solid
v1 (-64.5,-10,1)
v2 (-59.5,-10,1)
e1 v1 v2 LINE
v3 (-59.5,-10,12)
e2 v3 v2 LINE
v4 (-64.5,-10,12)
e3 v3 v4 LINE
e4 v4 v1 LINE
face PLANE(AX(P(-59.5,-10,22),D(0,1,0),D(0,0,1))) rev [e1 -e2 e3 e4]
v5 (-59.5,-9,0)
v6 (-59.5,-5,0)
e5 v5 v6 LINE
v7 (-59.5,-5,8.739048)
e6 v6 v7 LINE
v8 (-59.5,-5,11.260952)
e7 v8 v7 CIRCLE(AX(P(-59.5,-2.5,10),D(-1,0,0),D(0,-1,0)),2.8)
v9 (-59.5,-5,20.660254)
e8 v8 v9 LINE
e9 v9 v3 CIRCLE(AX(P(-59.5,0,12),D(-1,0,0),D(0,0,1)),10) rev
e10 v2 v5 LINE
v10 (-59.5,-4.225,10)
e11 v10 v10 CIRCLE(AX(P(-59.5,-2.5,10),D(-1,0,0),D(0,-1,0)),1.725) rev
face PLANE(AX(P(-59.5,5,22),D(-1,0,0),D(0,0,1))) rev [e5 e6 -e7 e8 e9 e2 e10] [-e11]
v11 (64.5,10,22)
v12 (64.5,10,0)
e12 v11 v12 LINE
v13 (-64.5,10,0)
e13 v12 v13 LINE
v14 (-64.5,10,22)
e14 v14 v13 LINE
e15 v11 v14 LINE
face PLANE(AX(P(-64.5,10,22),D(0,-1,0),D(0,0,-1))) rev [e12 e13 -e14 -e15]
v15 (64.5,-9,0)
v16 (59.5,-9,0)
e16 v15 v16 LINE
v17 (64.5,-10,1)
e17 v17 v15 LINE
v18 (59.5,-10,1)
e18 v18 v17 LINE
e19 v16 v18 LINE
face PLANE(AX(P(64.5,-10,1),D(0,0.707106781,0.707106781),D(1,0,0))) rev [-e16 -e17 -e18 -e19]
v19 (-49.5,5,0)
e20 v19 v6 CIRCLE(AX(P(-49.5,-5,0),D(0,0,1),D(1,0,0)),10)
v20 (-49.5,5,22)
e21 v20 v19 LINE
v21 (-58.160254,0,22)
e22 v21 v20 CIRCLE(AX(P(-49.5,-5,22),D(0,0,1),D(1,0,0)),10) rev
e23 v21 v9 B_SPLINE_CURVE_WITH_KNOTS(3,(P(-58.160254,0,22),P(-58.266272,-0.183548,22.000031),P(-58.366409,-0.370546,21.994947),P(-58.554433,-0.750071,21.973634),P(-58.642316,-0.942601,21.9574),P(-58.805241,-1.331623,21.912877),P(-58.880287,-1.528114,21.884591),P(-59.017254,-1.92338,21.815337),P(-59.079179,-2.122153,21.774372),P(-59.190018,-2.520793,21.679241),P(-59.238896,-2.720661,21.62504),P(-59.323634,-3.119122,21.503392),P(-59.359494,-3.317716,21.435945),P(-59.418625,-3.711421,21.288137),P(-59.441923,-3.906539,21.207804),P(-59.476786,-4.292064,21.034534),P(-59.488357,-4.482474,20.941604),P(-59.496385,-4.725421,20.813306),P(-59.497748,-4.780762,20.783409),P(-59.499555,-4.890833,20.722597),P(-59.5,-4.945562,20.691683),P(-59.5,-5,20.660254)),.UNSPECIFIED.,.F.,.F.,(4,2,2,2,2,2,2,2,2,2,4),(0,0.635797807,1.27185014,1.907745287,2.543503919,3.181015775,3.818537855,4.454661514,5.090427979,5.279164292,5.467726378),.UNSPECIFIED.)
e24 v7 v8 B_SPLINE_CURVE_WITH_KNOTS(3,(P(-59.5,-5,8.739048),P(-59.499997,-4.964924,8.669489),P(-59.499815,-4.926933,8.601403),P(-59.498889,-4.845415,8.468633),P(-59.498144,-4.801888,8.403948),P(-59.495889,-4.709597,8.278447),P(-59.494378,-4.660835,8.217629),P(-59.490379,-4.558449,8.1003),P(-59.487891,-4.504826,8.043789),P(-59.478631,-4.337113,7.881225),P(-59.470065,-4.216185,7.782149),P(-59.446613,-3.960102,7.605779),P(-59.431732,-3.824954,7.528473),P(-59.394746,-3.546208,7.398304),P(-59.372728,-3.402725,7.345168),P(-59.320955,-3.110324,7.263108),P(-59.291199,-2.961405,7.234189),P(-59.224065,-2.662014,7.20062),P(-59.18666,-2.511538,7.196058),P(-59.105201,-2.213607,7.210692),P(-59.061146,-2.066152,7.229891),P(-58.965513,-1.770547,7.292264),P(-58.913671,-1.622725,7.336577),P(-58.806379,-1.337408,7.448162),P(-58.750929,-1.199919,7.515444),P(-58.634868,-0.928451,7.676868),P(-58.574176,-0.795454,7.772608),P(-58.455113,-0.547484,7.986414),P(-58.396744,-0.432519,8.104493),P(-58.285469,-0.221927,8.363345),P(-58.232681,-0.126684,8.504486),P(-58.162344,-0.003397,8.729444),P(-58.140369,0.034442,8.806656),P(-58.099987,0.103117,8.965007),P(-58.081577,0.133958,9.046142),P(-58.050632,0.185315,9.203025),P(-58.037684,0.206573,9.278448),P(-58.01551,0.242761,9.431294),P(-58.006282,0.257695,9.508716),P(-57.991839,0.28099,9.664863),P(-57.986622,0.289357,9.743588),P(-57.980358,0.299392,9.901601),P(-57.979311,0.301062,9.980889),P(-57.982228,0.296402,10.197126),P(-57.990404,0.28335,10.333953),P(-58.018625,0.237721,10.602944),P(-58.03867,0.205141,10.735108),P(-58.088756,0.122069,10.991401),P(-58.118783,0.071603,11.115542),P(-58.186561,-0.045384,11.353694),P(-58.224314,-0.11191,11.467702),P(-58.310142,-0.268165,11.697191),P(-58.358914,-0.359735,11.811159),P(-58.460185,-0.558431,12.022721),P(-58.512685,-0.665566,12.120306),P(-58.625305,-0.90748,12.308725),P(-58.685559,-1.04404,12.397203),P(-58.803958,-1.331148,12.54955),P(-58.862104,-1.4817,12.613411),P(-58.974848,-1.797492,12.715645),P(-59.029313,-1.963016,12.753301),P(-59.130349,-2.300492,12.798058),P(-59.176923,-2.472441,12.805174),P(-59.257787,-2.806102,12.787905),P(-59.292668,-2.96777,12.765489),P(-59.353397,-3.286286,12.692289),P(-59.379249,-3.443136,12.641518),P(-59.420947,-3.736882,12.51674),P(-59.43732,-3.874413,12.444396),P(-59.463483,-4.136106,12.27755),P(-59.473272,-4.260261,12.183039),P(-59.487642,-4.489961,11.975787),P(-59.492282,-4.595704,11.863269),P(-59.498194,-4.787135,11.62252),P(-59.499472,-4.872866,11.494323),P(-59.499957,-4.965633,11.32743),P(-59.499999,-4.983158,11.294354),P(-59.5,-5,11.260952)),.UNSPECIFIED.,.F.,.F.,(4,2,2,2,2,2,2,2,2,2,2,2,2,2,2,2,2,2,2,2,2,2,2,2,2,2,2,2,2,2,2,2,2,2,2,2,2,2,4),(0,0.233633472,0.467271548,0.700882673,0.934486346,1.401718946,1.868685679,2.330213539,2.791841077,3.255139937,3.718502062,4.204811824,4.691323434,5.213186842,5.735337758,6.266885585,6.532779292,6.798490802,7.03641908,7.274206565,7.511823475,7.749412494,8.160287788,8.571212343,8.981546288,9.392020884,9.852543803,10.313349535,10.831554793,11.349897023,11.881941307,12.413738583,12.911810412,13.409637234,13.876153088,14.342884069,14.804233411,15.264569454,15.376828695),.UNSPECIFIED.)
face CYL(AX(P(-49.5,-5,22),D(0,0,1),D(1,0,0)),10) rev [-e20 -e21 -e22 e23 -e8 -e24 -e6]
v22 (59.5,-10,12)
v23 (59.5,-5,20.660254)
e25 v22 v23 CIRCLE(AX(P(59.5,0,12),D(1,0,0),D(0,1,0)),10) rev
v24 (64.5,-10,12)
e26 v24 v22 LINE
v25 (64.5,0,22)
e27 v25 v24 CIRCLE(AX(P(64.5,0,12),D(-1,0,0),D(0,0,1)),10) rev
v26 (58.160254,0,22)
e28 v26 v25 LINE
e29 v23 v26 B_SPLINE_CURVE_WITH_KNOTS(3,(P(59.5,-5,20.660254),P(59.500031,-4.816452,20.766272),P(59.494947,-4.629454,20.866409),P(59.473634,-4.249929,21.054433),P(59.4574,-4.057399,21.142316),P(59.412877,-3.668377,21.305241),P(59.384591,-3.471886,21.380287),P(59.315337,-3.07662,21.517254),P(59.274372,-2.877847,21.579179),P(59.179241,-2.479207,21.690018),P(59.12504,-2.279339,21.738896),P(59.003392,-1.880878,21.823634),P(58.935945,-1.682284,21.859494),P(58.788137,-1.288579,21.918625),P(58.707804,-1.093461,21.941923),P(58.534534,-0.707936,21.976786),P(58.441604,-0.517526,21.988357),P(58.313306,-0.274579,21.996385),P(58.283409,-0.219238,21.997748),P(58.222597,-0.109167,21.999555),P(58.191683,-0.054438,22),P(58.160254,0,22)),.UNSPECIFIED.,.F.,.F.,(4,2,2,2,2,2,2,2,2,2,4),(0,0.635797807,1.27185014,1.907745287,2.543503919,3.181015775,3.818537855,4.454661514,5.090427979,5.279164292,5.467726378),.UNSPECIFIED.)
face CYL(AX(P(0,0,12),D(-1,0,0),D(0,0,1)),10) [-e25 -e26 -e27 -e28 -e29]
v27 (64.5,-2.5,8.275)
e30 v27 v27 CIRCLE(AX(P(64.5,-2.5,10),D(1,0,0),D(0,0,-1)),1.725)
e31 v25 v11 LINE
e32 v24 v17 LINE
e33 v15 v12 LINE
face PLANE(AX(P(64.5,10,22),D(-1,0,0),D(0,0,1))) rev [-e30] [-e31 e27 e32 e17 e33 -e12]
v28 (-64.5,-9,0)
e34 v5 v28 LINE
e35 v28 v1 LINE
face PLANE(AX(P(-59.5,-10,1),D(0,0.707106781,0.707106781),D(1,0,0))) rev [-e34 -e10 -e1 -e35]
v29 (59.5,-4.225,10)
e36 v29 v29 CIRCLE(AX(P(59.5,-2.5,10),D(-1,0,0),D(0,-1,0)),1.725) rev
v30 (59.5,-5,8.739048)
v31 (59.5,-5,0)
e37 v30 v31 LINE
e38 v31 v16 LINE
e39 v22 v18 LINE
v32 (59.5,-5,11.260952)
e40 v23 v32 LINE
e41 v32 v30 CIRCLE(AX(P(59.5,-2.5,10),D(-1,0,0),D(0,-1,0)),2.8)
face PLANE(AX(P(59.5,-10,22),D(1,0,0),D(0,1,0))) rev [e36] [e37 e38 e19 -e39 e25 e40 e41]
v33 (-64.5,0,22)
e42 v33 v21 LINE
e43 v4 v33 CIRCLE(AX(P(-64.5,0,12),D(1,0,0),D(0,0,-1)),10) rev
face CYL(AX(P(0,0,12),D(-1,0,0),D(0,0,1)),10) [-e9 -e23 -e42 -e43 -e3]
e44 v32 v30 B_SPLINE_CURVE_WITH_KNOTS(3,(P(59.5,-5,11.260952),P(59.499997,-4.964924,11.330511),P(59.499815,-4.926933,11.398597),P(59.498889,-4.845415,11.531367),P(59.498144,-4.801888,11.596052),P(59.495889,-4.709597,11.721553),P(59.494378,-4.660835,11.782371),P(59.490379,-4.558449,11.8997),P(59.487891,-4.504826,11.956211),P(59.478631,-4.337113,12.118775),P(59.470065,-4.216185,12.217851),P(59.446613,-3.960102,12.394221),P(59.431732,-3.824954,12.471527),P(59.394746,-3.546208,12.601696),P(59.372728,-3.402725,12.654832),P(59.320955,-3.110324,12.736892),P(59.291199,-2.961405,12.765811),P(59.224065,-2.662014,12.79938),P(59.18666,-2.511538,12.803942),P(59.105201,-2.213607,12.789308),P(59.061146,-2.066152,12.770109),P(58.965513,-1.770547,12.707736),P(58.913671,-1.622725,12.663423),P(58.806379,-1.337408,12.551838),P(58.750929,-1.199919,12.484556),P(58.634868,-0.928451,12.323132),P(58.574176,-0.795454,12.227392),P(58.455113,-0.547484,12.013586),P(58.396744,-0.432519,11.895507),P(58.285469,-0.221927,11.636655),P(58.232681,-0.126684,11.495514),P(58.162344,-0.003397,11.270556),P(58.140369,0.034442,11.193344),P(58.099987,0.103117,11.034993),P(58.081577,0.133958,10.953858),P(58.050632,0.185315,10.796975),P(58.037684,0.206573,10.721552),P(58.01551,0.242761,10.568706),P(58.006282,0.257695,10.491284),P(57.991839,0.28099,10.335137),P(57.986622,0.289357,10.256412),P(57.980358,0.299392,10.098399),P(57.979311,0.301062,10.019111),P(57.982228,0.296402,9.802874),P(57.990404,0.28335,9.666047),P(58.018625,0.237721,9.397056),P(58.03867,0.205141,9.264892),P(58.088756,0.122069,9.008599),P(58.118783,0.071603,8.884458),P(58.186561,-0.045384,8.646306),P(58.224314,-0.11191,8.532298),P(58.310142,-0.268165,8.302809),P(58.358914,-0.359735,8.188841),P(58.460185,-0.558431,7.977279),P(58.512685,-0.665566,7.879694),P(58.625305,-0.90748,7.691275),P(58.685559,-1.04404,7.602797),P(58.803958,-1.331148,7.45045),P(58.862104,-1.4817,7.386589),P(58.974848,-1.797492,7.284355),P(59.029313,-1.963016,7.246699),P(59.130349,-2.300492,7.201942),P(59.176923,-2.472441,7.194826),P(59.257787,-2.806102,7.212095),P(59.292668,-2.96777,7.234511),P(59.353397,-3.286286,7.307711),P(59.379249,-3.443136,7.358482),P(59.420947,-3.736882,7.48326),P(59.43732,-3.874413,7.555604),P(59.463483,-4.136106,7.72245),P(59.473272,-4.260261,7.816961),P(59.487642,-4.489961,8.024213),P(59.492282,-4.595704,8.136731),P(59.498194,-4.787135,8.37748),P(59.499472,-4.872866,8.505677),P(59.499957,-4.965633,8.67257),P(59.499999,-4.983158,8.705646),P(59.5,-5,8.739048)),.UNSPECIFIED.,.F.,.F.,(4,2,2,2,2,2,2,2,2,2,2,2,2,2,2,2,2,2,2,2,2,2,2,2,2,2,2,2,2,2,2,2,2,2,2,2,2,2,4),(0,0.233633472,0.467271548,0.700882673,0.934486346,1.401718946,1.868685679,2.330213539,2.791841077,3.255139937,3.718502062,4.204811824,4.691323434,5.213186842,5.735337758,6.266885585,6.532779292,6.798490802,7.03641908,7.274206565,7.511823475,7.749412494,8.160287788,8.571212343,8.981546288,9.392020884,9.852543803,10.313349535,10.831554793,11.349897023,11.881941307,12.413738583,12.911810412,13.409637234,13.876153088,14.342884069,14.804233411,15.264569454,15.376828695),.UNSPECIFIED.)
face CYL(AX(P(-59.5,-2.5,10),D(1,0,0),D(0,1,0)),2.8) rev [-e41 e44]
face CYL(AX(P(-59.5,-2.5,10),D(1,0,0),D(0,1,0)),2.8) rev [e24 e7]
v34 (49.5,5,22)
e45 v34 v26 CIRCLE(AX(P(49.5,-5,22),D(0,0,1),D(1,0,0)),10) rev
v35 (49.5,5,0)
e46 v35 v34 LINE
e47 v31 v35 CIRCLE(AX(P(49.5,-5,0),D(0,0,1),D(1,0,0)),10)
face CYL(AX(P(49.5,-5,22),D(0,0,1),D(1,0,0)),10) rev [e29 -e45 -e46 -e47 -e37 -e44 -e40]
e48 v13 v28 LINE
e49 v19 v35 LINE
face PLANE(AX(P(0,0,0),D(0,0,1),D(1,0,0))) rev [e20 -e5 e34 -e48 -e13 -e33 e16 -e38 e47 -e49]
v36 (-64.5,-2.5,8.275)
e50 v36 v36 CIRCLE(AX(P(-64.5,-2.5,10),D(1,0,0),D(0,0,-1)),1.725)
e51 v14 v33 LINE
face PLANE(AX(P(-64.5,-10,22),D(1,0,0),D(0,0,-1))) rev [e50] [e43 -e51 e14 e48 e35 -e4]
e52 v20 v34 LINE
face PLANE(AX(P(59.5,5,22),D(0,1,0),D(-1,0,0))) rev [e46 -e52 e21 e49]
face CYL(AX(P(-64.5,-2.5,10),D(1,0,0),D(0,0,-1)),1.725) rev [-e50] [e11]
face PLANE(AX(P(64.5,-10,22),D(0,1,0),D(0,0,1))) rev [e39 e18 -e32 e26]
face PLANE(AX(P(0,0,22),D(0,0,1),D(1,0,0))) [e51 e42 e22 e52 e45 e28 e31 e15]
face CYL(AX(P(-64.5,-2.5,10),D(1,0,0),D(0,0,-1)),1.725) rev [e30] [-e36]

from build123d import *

# Parameters (mm, degrees)
BOSS_EXTRUDE1_DEPTH = 22
FILLET1_R           = 10
SKETCH2_R           = 1.725
CUT_EXTRUDE1_DEPTH  = 132.244047484
SKETCH3_R           = 2.8
CUT_EXTRUDE2_DEPTH  = 119
FILLET2_R           = 10
CHAMFER1_SIZE       = 1


with BuildPart() as part:
    # Sketch1 → Boss-Extrude1 (new body)
    with BuildSketch(Plane.XY):
        Polygon((-64.5, 10), (64.5, 10), (64.5, -10), (59.5, -10), (59.5, 5), (-59.5, 5), (-59.5, -10), (-64.5, -10), align=None)
    extrude(amount=BOSS_EXTRUDE1_DEPTH)

    # Fillet1
    fillet1_edges = [part.edges().sort_by_distance(p)[0] for p in [
        (-59.5, 5, 11),
        (59.5, 5, 11),
    ]]
    fillet(fillet1_edges, radius=FILLET1_R)

    # Sketch2 → Cut-Extrude1 (cut, through all)
    with BuildSketch(Plane(origin=(64.5, 0, 0), x_dir=(0, 0, -1), z_dir=(1, 0, 0))):
        with Locations((-10, -2.5)):
            Circle(SKETCH2_R)
    extrude(amount=-CUT_EXTRUDE1_DEPTH, mode=Mode.SUBTRACT)

    # Sketch3 → Cut-Extrude2 (cut)
    with BuildSketch(Plane.ZY.offset(-59.5)):
        with Locations((10, -2.5)):
            Circle(SKETCH3_R)
    extrude(amount=CUT_EXTRUDE2_DEPTH, mode=Mode.SUBTRACT)

    # Fillet2
    # the kernel refuses this fillet: 10 mm, written as the material it takes off along each edge
    with BuildSketch(Plane(origin=(89.5, -10, 22), x_dir=(0, 1, 0), z_dir=(-1, 0, 0))) as fillet2_piece_1:
        with BuildLine():
            CenterArc((FILLET2_R, FILLET2_R), FILLET2_R, 180, 90)
            Line((0, FILLET2_R), (0, 0))
            Line((0, 0), (FILLET2_R, 0))
        make_face()
    extrude(amount=55, mode=Mode.SUBTRACT)
    with BuildSketch(Plane(origin=(-34.5, -10, 22), x_dir=(0, 0, -1), z_dir=(-1, 0, 0))) as fillet2_piece_2:
        with BuildLine():
            CenterArc((FILLET2_R, -FILLET2_R), FILLET2_R, 90, 90)
            Line((0, -FILLET2_R), (0, 0))
            Line((0, 0), (FILLET2_R, 0))
        make_face()
    extrude(amount=55, mode=Mode.SUBTRACT)

    # Chamfer1
    chamfer1_edges = [part.edges().sort_by_distance(p)[0] for p in [
        (62, -10, 0),
        (-62, -10, 0),
    ]]
    chamfer(chamfer1_edges, length=CHAMFER1_SIZE)


solid = part.part
